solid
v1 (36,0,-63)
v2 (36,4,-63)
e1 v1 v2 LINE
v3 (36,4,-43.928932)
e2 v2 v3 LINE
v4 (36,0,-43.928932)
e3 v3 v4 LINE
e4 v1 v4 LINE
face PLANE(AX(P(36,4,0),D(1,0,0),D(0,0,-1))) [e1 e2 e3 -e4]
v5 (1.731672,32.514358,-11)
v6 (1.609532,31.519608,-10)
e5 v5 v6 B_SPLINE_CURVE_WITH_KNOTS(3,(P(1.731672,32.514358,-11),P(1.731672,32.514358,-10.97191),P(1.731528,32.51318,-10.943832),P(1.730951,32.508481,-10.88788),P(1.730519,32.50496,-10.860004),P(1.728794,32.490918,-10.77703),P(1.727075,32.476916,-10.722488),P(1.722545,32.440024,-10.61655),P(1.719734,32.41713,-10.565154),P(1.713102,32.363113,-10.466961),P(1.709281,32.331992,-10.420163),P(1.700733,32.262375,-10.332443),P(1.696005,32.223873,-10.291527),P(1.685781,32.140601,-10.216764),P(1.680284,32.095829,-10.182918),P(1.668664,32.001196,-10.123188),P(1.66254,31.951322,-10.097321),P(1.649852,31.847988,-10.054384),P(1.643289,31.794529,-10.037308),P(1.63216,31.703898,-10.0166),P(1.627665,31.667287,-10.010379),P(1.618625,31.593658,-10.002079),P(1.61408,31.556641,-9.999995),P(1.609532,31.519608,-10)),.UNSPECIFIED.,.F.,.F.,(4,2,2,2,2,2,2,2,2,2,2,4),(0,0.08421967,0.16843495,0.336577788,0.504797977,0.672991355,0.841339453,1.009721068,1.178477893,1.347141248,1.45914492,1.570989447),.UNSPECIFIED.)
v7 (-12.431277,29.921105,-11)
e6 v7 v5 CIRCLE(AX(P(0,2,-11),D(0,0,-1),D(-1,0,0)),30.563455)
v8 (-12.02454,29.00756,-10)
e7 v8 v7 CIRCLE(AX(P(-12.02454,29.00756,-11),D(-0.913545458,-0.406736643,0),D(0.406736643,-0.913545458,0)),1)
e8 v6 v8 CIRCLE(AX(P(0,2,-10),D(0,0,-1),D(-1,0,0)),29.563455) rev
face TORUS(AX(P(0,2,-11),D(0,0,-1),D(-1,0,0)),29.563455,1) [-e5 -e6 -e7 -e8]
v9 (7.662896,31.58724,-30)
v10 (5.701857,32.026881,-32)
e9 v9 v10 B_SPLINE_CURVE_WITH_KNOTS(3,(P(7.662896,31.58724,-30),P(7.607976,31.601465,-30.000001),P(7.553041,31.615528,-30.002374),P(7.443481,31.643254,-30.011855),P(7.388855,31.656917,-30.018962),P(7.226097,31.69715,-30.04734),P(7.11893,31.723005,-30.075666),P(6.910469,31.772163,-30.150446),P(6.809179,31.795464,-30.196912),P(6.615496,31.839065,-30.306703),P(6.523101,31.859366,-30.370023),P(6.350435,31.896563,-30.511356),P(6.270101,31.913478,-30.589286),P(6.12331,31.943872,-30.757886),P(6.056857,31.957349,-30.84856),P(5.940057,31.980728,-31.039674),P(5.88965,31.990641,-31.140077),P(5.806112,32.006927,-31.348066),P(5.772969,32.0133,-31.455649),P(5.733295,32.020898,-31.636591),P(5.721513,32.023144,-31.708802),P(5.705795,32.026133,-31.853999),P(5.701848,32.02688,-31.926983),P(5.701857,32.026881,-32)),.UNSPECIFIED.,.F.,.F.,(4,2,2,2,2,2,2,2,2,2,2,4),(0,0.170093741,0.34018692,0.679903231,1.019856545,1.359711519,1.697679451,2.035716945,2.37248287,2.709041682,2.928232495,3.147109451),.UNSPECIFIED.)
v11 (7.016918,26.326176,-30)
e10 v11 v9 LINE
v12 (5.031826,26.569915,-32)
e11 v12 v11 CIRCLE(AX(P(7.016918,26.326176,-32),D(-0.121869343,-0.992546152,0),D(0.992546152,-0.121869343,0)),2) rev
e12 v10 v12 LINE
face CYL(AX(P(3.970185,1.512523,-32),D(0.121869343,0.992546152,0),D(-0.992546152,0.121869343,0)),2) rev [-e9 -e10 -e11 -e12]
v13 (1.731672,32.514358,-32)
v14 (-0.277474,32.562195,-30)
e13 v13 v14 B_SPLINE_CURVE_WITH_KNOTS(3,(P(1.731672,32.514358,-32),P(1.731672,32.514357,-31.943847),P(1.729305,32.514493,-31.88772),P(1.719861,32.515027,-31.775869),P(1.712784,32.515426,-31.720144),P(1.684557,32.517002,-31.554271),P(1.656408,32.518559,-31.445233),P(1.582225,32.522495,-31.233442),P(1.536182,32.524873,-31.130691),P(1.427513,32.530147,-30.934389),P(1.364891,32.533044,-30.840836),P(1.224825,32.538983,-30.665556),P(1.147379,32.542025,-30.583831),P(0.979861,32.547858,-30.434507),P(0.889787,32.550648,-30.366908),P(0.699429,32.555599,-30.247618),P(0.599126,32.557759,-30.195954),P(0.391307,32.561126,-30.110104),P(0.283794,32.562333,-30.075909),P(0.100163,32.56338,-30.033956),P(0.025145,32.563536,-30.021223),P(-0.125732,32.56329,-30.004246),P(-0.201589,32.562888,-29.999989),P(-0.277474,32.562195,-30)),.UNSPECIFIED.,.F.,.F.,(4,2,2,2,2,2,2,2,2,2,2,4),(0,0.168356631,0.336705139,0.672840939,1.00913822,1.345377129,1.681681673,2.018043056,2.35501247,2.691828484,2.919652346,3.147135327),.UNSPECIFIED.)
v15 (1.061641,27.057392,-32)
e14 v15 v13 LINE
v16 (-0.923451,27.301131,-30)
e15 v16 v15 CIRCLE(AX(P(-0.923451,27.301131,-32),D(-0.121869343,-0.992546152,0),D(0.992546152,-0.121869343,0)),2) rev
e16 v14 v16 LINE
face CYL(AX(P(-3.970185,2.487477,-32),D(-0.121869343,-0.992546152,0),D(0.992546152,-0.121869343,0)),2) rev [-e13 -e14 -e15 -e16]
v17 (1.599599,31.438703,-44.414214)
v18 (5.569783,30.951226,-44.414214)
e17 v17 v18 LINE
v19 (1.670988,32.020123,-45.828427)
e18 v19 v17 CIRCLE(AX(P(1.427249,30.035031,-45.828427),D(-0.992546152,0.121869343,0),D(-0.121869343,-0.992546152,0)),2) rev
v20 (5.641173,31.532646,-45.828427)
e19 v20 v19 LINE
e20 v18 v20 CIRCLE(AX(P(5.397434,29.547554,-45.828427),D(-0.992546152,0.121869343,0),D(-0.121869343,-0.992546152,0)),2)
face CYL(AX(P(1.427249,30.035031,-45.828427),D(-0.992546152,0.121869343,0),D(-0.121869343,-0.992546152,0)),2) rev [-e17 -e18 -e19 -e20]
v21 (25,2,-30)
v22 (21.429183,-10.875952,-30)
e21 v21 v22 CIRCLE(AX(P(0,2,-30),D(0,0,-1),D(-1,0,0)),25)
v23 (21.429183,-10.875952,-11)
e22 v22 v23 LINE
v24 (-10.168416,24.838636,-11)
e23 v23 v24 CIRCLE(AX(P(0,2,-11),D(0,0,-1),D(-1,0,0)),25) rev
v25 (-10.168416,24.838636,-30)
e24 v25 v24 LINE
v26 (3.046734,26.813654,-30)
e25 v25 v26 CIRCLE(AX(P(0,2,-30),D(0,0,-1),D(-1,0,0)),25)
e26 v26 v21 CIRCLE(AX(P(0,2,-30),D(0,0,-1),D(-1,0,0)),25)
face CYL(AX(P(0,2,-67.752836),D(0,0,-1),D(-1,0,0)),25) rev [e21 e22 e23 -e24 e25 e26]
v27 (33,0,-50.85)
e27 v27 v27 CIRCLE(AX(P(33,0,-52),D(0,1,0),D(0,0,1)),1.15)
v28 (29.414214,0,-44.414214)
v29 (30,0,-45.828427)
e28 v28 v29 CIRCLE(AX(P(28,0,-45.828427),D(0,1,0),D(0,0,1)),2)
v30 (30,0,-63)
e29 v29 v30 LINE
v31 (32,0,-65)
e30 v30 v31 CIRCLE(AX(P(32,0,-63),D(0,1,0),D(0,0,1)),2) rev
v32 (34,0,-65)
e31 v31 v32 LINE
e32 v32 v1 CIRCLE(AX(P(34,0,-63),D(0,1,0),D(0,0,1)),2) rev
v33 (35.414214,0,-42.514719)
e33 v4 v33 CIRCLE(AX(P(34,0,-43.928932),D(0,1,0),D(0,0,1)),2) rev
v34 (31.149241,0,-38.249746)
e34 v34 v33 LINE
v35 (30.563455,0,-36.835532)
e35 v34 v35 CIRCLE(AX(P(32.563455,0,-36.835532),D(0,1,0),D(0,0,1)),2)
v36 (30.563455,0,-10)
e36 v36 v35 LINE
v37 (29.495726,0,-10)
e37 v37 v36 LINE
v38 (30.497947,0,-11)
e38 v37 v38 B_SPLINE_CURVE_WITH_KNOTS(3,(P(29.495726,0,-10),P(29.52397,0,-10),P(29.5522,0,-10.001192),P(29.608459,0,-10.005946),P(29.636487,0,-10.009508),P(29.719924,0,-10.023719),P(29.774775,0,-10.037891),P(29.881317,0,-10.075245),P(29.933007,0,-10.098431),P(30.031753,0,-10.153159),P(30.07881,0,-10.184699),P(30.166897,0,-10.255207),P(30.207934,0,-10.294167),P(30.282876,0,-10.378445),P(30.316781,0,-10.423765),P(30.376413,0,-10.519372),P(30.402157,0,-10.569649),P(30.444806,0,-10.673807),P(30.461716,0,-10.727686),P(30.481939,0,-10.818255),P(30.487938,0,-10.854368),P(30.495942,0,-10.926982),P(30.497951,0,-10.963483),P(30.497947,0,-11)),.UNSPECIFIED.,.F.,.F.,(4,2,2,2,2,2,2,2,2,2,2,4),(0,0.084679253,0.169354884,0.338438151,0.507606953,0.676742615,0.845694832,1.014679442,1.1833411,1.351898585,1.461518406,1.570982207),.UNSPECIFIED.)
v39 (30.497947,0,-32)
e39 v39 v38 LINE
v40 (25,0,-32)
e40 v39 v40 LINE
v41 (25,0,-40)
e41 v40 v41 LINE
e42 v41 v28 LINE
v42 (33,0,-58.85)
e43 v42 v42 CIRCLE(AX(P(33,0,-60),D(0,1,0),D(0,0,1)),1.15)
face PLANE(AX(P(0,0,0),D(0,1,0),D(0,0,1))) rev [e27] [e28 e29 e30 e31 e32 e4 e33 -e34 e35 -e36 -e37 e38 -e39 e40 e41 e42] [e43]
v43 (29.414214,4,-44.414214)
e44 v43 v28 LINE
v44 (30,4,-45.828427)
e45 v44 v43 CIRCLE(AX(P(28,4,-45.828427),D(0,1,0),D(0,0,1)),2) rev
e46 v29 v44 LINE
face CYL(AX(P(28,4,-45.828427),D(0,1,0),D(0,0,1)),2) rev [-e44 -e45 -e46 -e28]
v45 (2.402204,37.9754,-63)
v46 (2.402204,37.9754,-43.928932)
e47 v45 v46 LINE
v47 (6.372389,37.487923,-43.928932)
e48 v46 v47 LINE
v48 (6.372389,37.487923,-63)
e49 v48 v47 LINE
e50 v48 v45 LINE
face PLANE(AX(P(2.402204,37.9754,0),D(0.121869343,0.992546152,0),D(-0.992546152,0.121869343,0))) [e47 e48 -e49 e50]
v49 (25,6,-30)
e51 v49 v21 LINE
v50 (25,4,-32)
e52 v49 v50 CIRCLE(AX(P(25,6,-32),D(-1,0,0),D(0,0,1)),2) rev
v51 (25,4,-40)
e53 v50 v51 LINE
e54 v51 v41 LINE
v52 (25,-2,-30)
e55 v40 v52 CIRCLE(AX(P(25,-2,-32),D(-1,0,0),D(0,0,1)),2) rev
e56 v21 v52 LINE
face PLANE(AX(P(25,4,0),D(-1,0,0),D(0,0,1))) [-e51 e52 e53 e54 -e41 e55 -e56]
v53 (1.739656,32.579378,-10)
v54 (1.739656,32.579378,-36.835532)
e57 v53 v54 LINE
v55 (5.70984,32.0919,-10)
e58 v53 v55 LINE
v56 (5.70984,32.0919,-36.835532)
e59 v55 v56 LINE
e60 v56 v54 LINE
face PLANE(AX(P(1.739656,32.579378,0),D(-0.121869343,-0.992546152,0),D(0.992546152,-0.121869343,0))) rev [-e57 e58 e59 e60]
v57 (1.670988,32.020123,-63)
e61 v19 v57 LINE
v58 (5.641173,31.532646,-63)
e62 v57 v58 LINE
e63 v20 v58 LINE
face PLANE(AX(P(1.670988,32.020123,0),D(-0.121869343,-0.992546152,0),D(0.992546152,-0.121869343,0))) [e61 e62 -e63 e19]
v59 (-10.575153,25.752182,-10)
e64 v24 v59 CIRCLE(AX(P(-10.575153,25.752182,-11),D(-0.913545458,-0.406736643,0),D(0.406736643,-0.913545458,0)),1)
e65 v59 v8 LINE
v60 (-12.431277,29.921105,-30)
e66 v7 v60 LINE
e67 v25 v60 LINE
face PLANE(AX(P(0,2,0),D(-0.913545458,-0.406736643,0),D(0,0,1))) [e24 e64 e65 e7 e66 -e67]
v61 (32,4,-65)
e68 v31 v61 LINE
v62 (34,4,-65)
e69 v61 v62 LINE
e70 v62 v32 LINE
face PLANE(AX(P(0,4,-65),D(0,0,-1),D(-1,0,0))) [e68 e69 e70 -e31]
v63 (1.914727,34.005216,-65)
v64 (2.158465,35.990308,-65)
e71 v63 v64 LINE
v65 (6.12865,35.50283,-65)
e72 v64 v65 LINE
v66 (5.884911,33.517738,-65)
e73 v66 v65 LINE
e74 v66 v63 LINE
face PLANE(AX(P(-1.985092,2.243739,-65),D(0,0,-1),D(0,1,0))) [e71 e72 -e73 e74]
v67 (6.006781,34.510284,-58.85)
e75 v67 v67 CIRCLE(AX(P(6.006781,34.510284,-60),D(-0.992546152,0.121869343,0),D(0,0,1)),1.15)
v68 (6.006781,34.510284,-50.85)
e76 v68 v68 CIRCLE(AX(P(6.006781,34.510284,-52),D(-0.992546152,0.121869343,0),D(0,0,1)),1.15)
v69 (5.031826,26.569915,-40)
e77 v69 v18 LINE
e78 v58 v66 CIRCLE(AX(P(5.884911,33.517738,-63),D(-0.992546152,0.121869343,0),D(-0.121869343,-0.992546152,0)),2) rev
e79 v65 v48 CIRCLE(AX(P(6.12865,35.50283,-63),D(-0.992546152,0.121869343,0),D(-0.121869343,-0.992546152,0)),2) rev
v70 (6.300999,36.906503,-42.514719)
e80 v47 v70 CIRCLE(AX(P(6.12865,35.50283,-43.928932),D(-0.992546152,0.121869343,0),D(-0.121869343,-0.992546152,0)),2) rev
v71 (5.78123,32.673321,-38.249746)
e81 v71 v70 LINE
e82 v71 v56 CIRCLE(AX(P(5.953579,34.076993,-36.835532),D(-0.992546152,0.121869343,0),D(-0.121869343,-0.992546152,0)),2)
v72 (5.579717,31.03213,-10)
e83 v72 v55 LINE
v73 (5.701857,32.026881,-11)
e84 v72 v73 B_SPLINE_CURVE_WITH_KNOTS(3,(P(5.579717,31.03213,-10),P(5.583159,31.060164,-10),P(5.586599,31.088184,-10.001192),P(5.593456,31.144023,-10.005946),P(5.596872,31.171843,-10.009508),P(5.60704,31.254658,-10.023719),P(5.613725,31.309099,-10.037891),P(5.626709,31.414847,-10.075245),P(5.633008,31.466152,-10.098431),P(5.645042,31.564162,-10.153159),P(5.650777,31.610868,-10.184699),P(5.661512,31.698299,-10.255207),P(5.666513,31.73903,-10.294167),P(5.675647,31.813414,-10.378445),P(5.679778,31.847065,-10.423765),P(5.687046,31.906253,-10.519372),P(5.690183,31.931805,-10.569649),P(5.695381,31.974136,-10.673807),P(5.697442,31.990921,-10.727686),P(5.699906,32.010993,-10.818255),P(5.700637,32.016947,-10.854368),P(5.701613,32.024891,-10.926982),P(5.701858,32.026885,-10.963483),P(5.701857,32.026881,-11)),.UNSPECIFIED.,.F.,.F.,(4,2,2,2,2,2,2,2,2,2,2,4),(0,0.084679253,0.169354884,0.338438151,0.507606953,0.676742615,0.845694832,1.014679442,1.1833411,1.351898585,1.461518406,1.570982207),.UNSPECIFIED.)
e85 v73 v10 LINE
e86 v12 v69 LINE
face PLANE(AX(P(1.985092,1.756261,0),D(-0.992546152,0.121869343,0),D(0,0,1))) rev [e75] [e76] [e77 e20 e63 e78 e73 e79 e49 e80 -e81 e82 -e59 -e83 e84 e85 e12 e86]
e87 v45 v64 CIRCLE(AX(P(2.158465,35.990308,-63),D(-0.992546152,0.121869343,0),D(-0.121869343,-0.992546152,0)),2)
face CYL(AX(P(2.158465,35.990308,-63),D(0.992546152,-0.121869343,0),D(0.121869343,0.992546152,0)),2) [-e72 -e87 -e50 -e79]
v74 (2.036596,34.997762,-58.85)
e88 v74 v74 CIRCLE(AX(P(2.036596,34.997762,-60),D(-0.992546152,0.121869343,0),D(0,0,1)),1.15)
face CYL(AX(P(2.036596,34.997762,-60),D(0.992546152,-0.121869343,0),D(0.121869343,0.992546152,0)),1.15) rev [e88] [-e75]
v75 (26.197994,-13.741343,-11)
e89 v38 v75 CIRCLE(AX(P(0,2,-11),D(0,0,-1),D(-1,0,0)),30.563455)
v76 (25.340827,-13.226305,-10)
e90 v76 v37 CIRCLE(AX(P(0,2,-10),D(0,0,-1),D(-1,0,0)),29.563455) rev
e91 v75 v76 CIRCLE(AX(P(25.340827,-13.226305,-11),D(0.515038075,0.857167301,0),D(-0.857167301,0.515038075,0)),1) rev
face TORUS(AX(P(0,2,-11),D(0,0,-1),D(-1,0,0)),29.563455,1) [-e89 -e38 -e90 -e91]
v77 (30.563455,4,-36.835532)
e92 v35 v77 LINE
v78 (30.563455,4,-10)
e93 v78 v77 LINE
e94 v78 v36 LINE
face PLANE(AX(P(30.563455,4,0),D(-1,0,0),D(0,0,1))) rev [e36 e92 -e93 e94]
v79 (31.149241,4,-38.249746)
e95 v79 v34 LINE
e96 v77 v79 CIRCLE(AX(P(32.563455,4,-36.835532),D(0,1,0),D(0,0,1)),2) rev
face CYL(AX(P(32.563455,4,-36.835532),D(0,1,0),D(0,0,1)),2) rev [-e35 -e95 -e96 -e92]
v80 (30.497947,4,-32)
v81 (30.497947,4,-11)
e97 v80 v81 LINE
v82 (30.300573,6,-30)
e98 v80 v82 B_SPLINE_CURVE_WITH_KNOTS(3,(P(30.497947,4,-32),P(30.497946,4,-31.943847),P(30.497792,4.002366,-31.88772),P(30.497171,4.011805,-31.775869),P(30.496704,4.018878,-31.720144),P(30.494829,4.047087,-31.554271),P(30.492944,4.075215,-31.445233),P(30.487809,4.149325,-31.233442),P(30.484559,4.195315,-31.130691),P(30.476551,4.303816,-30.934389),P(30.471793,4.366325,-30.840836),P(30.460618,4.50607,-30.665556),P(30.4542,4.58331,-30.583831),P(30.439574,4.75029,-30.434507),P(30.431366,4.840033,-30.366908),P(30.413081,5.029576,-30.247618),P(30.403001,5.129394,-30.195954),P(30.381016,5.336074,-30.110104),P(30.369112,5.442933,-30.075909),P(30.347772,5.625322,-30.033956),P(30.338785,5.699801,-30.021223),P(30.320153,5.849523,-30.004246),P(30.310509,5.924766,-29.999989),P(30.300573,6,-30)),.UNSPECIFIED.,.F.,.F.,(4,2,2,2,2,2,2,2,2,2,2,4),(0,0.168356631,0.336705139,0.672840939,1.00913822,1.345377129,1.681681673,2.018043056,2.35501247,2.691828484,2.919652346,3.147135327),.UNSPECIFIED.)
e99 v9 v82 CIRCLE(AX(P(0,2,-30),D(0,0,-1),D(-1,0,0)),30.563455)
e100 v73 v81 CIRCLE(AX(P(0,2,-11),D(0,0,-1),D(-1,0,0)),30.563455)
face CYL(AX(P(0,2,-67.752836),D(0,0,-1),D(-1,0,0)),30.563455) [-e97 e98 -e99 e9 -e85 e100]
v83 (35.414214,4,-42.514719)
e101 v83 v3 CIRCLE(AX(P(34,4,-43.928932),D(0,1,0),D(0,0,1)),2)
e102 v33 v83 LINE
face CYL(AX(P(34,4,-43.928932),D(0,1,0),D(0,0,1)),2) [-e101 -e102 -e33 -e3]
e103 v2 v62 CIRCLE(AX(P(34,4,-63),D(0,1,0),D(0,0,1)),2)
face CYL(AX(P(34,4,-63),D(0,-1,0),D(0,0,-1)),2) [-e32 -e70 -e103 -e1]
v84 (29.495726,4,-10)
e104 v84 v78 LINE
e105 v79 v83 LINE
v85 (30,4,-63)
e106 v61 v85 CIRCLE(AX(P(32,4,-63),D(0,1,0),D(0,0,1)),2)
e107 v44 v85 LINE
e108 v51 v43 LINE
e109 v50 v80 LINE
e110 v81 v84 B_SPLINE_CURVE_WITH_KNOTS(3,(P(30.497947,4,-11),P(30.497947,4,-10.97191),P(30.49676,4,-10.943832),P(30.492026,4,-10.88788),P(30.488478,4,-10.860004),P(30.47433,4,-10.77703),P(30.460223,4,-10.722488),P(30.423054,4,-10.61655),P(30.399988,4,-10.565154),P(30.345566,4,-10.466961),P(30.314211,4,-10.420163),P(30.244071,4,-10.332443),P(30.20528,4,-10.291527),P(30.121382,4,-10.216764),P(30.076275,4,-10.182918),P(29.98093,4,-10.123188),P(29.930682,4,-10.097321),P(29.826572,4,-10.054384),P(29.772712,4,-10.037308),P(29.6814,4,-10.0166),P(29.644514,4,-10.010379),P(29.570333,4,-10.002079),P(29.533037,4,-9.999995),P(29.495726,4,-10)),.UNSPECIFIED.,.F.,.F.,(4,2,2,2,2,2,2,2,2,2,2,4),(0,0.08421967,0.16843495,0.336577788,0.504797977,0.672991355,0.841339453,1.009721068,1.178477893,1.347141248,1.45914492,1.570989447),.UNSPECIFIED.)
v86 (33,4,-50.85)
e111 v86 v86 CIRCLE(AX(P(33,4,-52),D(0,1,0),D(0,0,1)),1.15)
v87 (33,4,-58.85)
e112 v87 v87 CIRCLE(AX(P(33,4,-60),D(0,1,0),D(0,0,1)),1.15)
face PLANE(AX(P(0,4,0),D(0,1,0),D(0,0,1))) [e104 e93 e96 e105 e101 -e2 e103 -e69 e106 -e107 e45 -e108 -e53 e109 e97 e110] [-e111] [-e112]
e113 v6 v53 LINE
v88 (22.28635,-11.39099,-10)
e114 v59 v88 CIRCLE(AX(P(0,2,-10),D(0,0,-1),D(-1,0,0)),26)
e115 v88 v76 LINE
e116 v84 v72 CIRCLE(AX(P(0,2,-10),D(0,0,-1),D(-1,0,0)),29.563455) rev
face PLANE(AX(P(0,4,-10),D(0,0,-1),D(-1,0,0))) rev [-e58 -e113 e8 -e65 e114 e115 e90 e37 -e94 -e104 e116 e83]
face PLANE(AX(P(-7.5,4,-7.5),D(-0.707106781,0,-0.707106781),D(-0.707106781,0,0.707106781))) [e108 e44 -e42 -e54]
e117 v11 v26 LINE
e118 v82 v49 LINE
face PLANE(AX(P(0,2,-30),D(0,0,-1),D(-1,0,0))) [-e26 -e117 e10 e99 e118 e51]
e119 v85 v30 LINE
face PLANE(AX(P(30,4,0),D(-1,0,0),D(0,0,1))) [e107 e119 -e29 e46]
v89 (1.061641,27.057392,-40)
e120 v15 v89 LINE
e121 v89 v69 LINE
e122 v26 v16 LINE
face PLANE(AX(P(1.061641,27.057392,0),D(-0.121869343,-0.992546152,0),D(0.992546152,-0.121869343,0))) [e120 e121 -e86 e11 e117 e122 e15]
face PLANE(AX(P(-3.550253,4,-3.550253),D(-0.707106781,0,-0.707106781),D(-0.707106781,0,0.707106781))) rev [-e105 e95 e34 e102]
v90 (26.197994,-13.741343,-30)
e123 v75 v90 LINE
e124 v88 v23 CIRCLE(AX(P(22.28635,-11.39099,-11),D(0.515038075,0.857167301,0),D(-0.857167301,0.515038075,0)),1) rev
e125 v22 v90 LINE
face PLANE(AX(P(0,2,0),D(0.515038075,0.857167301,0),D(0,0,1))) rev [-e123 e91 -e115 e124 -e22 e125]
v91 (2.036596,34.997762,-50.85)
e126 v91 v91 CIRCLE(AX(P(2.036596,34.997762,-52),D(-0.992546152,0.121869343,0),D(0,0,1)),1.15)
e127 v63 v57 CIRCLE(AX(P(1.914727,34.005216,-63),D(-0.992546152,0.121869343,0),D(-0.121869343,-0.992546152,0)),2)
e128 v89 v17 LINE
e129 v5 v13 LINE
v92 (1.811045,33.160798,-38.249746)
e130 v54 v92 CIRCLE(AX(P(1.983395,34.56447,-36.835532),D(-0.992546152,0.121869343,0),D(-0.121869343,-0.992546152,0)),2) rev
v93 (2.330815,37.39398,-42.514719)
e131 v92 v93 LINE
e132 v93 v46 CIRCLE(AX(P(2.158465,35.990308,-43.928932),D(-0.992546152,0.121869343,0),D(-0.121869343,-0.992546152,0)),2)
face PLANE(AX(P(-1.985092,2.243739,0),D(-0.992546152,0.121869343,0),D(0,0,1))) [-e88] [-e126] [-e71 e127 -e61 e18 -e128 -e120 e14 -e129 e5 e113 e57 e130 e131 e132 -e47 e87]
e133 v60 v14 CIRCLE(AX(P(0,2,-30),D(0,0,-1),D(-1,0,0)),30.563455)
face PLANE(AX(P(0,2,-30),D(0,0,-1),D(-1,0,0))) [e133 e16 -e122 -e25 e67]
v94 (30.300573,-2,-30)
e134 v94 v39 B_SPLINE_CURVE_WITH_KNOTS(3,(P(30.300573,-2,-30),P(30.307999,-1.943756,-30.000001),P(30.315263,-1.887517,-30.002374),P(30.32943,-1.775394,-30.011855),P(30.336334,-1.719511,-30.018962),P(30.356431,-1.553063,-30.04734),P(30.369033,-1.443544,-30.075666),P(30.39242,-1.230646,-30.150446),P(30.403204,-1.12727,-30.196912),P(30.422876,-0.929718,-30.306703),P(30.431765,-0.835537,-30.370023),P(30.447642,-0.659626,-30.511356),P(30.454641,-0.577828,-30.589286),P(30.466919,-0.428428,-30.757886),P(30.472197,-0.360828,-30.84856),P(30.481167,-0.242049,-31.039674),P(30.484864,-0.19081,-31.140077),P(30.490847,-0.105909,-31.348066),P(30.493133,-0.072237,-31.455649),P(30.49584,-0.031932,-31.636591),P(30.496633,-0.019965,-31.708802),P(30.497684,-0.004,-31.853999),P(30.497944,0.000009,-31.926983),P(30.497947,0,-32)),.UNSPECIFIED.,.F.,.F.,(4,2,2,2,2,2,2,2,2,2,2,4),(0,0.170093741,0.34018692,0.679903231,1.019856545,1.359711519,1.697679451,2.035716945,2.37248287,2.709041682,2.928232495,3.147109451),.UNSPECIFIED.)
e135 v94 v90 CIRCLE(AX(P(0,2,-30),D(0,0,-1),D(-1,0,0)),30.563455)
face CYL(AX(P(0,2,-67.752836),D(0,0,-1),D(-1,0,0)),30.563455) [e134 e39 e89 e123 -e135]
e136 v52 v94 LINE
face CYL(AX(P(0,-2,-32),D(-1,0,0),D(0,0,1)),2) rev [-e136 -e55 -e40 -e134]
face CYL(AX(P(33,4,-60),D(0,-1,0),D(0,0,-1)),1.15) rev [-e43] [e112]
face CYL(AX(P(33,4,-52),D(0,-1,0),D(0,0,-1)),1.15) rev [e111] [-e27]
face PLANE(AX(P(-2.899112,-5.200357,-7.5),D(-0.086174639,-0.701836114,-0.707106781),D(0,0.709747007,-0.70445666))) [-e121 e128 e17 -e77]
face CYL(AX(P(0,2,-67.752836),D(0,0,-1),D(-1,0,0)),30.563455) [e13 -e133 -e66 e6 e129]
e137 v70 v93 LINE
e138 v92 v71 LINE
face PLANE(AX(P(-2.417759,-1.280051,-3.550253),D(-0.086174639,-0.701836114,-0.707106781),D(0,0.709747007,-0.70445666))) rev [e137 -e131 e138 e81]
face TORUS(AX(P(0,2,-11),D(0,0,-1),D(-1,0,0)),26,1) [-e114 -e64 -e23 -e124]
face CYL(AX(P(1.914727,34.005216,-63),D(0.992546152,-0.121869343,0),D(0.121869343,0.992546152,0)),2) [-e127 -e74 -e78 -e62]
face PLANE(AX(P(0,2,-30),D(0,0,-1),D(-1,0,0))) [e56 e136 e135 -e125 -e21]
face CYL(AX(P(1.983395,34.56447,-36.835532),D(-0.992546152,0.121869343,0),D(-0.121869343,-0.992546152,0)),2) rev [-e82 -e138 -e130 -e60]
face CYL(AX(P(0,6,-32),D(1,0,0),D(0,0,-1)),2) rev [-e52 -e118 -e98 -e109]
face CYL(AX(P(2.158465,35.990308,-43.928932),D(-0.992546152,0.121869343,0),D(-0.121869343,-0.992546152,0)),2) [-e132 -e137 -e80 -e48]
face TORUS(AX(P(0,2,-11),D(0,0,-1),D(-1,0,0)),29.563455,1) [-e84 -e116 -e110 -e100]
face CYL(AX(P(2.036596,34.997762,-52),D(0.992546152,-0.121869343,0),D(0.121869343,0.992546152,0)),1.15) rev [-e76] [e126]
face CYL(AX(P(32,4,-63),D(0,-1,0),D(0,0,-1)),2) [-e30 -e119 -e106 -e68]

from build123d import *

# Parameters (mm, degrees)
SKETCH_1_R                       = 1.15
EXTRUDE_1_DEPTH                  = 4
FILLET_1_R                       = 2
SKETCH_2_W                       = 5.563454525
SKETCH_2_H                       = 20
REVOLVE_2_ANGLE                  = 114
REVOLVE_2_OTHER_WAY_ANGLE        = 31
PATTERN_CIRCULAR_4_COUNT         = 2
PATTERN_CIRCULAR_4_ANGLE         = 83
FILLET_1_OF_PATTERN_CIRCULAR_4_R = 2
FILLET_2_R                       = 1
FILLET_3_R                       = 2


with BuildPart() as part:
    # 草图1 → 凸台-拉伸1 (new body)
    with BuildSketch(Plane(origin=(0, 0, 0), x_dir=(1, 0, 0), z_dir=(0, 1, 0))):
        Polygon((25, 40), (25, 10), (30.563454525, 10), (30.563454525, 37.663959588), (36, 43.100505063), (36, 65), (30, 65), (30, 45), align=None)
        with Locations((33, 52)):
            Circle(SKETCH_1_R, mode=Mode.SUBTRACT)
        with Locations((33, 60)):
            Circle(SKETCH_1_R, mode=Mode.SUBTRACT)
    extrude_1 = extrude(amount=EXTRUDE_1_DEPTH)

    # 圆角1
    fillet_1_edges = [part.edges().sort_by_distance(p)[0] for p in [
        (30.563454525, 2, -37.663959588),
        (30, 2, -45),
        (36, 2, -43.100505063),
        (36, 2, -65),
        (30, 2, -65),
    ]]
    fillet(fillet_1_edges, radius=FILLET_1_R)

    # 草图2 → 旋转2 (revolve)
    with BuildSketch(Plane(origin=(0, 2, 0), x_dir=(1, 0, 0), z_dir=(0, 1, 0))):
        with Locations((27.781727262, 20)):
            Rectangle(SKETCH_2_W, SKETCH_2_H)
    revolve(axis=Axis((0, 2, -67.752835875), (0, 0, 1)), revolution_arc=REVOLVE_2_ANGLE)

    # 草图2 → 旋转2 other way (revolve)
    with BuildSketch(Plane(origin=(0, 2, 0), x_dir=(1, 0, 0), z_dir=(0, 1, 0))):
        with Locations((27.781727262, 20)):
            Rectangle(SKETCH_2_W, SKETCH_2_H)
    revolve(axis=Axis((0, 2, -67.752835875), (0, 0, -1)), revolution_arc=REVOLVE_2_OTHER_WAY_ANGLE)

    # 阵列(圆周)4: 凸台-拉伸1 ×2 about axis
    pattern_circular_4_axis = Axis((0, 2, -67.752835875), (0, 0, 1))
    for i in range(1, PATTERN_CIRCULAR_4_COUNT):
        add(extrude_1.rotate(pattern_circular_4_axis, i * PATTERN_CIRCULAR_4_ANGLE / (PATTERN_CIRCULAR_4_COUNT - 1)))

    # 圆角1 of 阵列(圆周)4
    fillet_1_of_pattern_circular_4_edges = [part.edges().sort_by_distance(p)[0] for p in [
        (3.724748135, 32.335639169, -37.663959588),
        (3.656080302, 31.776384549, -45),
        (4.387296363, 37.731661459, -43.100505063),
        (4.387296363, 37.731661459, -65),
        (3.656080302, 31.776384549, -65),
    ]]
    fillet(fillet_1_of_pattern_circular_4_edges, radius=FILLET_1_OF_PATTERN_CIRCULAR_4_R)

    # 圆角2
    fillet_2_edges = [part.edges().sort_by_distance(p)[0] for p in [
        (29.168708283, -7.127497445, -10),
        (22.890674113, 22.251957711, -10),
        (-5.504691137, 32.063651275, -10),
        (18.72389302, 18.565501205, -10),
    ]]
    fillet(fillet_2_edges, radius=FILLET_2_R)

    # 圆角3
    fillet_3_edges = [part.edges().sort_by_distance(p)[0] for p in [
        (5.366841465, 29.29839802, -30),
        (1.396656859, 29.785875394, -30),
        (27.748973347, 4, -30),
        (27.748973347, 0, -30),
    ]]
    fillet(fillet_3_edges, radius=FILLET_3_R)


solid = part.part
